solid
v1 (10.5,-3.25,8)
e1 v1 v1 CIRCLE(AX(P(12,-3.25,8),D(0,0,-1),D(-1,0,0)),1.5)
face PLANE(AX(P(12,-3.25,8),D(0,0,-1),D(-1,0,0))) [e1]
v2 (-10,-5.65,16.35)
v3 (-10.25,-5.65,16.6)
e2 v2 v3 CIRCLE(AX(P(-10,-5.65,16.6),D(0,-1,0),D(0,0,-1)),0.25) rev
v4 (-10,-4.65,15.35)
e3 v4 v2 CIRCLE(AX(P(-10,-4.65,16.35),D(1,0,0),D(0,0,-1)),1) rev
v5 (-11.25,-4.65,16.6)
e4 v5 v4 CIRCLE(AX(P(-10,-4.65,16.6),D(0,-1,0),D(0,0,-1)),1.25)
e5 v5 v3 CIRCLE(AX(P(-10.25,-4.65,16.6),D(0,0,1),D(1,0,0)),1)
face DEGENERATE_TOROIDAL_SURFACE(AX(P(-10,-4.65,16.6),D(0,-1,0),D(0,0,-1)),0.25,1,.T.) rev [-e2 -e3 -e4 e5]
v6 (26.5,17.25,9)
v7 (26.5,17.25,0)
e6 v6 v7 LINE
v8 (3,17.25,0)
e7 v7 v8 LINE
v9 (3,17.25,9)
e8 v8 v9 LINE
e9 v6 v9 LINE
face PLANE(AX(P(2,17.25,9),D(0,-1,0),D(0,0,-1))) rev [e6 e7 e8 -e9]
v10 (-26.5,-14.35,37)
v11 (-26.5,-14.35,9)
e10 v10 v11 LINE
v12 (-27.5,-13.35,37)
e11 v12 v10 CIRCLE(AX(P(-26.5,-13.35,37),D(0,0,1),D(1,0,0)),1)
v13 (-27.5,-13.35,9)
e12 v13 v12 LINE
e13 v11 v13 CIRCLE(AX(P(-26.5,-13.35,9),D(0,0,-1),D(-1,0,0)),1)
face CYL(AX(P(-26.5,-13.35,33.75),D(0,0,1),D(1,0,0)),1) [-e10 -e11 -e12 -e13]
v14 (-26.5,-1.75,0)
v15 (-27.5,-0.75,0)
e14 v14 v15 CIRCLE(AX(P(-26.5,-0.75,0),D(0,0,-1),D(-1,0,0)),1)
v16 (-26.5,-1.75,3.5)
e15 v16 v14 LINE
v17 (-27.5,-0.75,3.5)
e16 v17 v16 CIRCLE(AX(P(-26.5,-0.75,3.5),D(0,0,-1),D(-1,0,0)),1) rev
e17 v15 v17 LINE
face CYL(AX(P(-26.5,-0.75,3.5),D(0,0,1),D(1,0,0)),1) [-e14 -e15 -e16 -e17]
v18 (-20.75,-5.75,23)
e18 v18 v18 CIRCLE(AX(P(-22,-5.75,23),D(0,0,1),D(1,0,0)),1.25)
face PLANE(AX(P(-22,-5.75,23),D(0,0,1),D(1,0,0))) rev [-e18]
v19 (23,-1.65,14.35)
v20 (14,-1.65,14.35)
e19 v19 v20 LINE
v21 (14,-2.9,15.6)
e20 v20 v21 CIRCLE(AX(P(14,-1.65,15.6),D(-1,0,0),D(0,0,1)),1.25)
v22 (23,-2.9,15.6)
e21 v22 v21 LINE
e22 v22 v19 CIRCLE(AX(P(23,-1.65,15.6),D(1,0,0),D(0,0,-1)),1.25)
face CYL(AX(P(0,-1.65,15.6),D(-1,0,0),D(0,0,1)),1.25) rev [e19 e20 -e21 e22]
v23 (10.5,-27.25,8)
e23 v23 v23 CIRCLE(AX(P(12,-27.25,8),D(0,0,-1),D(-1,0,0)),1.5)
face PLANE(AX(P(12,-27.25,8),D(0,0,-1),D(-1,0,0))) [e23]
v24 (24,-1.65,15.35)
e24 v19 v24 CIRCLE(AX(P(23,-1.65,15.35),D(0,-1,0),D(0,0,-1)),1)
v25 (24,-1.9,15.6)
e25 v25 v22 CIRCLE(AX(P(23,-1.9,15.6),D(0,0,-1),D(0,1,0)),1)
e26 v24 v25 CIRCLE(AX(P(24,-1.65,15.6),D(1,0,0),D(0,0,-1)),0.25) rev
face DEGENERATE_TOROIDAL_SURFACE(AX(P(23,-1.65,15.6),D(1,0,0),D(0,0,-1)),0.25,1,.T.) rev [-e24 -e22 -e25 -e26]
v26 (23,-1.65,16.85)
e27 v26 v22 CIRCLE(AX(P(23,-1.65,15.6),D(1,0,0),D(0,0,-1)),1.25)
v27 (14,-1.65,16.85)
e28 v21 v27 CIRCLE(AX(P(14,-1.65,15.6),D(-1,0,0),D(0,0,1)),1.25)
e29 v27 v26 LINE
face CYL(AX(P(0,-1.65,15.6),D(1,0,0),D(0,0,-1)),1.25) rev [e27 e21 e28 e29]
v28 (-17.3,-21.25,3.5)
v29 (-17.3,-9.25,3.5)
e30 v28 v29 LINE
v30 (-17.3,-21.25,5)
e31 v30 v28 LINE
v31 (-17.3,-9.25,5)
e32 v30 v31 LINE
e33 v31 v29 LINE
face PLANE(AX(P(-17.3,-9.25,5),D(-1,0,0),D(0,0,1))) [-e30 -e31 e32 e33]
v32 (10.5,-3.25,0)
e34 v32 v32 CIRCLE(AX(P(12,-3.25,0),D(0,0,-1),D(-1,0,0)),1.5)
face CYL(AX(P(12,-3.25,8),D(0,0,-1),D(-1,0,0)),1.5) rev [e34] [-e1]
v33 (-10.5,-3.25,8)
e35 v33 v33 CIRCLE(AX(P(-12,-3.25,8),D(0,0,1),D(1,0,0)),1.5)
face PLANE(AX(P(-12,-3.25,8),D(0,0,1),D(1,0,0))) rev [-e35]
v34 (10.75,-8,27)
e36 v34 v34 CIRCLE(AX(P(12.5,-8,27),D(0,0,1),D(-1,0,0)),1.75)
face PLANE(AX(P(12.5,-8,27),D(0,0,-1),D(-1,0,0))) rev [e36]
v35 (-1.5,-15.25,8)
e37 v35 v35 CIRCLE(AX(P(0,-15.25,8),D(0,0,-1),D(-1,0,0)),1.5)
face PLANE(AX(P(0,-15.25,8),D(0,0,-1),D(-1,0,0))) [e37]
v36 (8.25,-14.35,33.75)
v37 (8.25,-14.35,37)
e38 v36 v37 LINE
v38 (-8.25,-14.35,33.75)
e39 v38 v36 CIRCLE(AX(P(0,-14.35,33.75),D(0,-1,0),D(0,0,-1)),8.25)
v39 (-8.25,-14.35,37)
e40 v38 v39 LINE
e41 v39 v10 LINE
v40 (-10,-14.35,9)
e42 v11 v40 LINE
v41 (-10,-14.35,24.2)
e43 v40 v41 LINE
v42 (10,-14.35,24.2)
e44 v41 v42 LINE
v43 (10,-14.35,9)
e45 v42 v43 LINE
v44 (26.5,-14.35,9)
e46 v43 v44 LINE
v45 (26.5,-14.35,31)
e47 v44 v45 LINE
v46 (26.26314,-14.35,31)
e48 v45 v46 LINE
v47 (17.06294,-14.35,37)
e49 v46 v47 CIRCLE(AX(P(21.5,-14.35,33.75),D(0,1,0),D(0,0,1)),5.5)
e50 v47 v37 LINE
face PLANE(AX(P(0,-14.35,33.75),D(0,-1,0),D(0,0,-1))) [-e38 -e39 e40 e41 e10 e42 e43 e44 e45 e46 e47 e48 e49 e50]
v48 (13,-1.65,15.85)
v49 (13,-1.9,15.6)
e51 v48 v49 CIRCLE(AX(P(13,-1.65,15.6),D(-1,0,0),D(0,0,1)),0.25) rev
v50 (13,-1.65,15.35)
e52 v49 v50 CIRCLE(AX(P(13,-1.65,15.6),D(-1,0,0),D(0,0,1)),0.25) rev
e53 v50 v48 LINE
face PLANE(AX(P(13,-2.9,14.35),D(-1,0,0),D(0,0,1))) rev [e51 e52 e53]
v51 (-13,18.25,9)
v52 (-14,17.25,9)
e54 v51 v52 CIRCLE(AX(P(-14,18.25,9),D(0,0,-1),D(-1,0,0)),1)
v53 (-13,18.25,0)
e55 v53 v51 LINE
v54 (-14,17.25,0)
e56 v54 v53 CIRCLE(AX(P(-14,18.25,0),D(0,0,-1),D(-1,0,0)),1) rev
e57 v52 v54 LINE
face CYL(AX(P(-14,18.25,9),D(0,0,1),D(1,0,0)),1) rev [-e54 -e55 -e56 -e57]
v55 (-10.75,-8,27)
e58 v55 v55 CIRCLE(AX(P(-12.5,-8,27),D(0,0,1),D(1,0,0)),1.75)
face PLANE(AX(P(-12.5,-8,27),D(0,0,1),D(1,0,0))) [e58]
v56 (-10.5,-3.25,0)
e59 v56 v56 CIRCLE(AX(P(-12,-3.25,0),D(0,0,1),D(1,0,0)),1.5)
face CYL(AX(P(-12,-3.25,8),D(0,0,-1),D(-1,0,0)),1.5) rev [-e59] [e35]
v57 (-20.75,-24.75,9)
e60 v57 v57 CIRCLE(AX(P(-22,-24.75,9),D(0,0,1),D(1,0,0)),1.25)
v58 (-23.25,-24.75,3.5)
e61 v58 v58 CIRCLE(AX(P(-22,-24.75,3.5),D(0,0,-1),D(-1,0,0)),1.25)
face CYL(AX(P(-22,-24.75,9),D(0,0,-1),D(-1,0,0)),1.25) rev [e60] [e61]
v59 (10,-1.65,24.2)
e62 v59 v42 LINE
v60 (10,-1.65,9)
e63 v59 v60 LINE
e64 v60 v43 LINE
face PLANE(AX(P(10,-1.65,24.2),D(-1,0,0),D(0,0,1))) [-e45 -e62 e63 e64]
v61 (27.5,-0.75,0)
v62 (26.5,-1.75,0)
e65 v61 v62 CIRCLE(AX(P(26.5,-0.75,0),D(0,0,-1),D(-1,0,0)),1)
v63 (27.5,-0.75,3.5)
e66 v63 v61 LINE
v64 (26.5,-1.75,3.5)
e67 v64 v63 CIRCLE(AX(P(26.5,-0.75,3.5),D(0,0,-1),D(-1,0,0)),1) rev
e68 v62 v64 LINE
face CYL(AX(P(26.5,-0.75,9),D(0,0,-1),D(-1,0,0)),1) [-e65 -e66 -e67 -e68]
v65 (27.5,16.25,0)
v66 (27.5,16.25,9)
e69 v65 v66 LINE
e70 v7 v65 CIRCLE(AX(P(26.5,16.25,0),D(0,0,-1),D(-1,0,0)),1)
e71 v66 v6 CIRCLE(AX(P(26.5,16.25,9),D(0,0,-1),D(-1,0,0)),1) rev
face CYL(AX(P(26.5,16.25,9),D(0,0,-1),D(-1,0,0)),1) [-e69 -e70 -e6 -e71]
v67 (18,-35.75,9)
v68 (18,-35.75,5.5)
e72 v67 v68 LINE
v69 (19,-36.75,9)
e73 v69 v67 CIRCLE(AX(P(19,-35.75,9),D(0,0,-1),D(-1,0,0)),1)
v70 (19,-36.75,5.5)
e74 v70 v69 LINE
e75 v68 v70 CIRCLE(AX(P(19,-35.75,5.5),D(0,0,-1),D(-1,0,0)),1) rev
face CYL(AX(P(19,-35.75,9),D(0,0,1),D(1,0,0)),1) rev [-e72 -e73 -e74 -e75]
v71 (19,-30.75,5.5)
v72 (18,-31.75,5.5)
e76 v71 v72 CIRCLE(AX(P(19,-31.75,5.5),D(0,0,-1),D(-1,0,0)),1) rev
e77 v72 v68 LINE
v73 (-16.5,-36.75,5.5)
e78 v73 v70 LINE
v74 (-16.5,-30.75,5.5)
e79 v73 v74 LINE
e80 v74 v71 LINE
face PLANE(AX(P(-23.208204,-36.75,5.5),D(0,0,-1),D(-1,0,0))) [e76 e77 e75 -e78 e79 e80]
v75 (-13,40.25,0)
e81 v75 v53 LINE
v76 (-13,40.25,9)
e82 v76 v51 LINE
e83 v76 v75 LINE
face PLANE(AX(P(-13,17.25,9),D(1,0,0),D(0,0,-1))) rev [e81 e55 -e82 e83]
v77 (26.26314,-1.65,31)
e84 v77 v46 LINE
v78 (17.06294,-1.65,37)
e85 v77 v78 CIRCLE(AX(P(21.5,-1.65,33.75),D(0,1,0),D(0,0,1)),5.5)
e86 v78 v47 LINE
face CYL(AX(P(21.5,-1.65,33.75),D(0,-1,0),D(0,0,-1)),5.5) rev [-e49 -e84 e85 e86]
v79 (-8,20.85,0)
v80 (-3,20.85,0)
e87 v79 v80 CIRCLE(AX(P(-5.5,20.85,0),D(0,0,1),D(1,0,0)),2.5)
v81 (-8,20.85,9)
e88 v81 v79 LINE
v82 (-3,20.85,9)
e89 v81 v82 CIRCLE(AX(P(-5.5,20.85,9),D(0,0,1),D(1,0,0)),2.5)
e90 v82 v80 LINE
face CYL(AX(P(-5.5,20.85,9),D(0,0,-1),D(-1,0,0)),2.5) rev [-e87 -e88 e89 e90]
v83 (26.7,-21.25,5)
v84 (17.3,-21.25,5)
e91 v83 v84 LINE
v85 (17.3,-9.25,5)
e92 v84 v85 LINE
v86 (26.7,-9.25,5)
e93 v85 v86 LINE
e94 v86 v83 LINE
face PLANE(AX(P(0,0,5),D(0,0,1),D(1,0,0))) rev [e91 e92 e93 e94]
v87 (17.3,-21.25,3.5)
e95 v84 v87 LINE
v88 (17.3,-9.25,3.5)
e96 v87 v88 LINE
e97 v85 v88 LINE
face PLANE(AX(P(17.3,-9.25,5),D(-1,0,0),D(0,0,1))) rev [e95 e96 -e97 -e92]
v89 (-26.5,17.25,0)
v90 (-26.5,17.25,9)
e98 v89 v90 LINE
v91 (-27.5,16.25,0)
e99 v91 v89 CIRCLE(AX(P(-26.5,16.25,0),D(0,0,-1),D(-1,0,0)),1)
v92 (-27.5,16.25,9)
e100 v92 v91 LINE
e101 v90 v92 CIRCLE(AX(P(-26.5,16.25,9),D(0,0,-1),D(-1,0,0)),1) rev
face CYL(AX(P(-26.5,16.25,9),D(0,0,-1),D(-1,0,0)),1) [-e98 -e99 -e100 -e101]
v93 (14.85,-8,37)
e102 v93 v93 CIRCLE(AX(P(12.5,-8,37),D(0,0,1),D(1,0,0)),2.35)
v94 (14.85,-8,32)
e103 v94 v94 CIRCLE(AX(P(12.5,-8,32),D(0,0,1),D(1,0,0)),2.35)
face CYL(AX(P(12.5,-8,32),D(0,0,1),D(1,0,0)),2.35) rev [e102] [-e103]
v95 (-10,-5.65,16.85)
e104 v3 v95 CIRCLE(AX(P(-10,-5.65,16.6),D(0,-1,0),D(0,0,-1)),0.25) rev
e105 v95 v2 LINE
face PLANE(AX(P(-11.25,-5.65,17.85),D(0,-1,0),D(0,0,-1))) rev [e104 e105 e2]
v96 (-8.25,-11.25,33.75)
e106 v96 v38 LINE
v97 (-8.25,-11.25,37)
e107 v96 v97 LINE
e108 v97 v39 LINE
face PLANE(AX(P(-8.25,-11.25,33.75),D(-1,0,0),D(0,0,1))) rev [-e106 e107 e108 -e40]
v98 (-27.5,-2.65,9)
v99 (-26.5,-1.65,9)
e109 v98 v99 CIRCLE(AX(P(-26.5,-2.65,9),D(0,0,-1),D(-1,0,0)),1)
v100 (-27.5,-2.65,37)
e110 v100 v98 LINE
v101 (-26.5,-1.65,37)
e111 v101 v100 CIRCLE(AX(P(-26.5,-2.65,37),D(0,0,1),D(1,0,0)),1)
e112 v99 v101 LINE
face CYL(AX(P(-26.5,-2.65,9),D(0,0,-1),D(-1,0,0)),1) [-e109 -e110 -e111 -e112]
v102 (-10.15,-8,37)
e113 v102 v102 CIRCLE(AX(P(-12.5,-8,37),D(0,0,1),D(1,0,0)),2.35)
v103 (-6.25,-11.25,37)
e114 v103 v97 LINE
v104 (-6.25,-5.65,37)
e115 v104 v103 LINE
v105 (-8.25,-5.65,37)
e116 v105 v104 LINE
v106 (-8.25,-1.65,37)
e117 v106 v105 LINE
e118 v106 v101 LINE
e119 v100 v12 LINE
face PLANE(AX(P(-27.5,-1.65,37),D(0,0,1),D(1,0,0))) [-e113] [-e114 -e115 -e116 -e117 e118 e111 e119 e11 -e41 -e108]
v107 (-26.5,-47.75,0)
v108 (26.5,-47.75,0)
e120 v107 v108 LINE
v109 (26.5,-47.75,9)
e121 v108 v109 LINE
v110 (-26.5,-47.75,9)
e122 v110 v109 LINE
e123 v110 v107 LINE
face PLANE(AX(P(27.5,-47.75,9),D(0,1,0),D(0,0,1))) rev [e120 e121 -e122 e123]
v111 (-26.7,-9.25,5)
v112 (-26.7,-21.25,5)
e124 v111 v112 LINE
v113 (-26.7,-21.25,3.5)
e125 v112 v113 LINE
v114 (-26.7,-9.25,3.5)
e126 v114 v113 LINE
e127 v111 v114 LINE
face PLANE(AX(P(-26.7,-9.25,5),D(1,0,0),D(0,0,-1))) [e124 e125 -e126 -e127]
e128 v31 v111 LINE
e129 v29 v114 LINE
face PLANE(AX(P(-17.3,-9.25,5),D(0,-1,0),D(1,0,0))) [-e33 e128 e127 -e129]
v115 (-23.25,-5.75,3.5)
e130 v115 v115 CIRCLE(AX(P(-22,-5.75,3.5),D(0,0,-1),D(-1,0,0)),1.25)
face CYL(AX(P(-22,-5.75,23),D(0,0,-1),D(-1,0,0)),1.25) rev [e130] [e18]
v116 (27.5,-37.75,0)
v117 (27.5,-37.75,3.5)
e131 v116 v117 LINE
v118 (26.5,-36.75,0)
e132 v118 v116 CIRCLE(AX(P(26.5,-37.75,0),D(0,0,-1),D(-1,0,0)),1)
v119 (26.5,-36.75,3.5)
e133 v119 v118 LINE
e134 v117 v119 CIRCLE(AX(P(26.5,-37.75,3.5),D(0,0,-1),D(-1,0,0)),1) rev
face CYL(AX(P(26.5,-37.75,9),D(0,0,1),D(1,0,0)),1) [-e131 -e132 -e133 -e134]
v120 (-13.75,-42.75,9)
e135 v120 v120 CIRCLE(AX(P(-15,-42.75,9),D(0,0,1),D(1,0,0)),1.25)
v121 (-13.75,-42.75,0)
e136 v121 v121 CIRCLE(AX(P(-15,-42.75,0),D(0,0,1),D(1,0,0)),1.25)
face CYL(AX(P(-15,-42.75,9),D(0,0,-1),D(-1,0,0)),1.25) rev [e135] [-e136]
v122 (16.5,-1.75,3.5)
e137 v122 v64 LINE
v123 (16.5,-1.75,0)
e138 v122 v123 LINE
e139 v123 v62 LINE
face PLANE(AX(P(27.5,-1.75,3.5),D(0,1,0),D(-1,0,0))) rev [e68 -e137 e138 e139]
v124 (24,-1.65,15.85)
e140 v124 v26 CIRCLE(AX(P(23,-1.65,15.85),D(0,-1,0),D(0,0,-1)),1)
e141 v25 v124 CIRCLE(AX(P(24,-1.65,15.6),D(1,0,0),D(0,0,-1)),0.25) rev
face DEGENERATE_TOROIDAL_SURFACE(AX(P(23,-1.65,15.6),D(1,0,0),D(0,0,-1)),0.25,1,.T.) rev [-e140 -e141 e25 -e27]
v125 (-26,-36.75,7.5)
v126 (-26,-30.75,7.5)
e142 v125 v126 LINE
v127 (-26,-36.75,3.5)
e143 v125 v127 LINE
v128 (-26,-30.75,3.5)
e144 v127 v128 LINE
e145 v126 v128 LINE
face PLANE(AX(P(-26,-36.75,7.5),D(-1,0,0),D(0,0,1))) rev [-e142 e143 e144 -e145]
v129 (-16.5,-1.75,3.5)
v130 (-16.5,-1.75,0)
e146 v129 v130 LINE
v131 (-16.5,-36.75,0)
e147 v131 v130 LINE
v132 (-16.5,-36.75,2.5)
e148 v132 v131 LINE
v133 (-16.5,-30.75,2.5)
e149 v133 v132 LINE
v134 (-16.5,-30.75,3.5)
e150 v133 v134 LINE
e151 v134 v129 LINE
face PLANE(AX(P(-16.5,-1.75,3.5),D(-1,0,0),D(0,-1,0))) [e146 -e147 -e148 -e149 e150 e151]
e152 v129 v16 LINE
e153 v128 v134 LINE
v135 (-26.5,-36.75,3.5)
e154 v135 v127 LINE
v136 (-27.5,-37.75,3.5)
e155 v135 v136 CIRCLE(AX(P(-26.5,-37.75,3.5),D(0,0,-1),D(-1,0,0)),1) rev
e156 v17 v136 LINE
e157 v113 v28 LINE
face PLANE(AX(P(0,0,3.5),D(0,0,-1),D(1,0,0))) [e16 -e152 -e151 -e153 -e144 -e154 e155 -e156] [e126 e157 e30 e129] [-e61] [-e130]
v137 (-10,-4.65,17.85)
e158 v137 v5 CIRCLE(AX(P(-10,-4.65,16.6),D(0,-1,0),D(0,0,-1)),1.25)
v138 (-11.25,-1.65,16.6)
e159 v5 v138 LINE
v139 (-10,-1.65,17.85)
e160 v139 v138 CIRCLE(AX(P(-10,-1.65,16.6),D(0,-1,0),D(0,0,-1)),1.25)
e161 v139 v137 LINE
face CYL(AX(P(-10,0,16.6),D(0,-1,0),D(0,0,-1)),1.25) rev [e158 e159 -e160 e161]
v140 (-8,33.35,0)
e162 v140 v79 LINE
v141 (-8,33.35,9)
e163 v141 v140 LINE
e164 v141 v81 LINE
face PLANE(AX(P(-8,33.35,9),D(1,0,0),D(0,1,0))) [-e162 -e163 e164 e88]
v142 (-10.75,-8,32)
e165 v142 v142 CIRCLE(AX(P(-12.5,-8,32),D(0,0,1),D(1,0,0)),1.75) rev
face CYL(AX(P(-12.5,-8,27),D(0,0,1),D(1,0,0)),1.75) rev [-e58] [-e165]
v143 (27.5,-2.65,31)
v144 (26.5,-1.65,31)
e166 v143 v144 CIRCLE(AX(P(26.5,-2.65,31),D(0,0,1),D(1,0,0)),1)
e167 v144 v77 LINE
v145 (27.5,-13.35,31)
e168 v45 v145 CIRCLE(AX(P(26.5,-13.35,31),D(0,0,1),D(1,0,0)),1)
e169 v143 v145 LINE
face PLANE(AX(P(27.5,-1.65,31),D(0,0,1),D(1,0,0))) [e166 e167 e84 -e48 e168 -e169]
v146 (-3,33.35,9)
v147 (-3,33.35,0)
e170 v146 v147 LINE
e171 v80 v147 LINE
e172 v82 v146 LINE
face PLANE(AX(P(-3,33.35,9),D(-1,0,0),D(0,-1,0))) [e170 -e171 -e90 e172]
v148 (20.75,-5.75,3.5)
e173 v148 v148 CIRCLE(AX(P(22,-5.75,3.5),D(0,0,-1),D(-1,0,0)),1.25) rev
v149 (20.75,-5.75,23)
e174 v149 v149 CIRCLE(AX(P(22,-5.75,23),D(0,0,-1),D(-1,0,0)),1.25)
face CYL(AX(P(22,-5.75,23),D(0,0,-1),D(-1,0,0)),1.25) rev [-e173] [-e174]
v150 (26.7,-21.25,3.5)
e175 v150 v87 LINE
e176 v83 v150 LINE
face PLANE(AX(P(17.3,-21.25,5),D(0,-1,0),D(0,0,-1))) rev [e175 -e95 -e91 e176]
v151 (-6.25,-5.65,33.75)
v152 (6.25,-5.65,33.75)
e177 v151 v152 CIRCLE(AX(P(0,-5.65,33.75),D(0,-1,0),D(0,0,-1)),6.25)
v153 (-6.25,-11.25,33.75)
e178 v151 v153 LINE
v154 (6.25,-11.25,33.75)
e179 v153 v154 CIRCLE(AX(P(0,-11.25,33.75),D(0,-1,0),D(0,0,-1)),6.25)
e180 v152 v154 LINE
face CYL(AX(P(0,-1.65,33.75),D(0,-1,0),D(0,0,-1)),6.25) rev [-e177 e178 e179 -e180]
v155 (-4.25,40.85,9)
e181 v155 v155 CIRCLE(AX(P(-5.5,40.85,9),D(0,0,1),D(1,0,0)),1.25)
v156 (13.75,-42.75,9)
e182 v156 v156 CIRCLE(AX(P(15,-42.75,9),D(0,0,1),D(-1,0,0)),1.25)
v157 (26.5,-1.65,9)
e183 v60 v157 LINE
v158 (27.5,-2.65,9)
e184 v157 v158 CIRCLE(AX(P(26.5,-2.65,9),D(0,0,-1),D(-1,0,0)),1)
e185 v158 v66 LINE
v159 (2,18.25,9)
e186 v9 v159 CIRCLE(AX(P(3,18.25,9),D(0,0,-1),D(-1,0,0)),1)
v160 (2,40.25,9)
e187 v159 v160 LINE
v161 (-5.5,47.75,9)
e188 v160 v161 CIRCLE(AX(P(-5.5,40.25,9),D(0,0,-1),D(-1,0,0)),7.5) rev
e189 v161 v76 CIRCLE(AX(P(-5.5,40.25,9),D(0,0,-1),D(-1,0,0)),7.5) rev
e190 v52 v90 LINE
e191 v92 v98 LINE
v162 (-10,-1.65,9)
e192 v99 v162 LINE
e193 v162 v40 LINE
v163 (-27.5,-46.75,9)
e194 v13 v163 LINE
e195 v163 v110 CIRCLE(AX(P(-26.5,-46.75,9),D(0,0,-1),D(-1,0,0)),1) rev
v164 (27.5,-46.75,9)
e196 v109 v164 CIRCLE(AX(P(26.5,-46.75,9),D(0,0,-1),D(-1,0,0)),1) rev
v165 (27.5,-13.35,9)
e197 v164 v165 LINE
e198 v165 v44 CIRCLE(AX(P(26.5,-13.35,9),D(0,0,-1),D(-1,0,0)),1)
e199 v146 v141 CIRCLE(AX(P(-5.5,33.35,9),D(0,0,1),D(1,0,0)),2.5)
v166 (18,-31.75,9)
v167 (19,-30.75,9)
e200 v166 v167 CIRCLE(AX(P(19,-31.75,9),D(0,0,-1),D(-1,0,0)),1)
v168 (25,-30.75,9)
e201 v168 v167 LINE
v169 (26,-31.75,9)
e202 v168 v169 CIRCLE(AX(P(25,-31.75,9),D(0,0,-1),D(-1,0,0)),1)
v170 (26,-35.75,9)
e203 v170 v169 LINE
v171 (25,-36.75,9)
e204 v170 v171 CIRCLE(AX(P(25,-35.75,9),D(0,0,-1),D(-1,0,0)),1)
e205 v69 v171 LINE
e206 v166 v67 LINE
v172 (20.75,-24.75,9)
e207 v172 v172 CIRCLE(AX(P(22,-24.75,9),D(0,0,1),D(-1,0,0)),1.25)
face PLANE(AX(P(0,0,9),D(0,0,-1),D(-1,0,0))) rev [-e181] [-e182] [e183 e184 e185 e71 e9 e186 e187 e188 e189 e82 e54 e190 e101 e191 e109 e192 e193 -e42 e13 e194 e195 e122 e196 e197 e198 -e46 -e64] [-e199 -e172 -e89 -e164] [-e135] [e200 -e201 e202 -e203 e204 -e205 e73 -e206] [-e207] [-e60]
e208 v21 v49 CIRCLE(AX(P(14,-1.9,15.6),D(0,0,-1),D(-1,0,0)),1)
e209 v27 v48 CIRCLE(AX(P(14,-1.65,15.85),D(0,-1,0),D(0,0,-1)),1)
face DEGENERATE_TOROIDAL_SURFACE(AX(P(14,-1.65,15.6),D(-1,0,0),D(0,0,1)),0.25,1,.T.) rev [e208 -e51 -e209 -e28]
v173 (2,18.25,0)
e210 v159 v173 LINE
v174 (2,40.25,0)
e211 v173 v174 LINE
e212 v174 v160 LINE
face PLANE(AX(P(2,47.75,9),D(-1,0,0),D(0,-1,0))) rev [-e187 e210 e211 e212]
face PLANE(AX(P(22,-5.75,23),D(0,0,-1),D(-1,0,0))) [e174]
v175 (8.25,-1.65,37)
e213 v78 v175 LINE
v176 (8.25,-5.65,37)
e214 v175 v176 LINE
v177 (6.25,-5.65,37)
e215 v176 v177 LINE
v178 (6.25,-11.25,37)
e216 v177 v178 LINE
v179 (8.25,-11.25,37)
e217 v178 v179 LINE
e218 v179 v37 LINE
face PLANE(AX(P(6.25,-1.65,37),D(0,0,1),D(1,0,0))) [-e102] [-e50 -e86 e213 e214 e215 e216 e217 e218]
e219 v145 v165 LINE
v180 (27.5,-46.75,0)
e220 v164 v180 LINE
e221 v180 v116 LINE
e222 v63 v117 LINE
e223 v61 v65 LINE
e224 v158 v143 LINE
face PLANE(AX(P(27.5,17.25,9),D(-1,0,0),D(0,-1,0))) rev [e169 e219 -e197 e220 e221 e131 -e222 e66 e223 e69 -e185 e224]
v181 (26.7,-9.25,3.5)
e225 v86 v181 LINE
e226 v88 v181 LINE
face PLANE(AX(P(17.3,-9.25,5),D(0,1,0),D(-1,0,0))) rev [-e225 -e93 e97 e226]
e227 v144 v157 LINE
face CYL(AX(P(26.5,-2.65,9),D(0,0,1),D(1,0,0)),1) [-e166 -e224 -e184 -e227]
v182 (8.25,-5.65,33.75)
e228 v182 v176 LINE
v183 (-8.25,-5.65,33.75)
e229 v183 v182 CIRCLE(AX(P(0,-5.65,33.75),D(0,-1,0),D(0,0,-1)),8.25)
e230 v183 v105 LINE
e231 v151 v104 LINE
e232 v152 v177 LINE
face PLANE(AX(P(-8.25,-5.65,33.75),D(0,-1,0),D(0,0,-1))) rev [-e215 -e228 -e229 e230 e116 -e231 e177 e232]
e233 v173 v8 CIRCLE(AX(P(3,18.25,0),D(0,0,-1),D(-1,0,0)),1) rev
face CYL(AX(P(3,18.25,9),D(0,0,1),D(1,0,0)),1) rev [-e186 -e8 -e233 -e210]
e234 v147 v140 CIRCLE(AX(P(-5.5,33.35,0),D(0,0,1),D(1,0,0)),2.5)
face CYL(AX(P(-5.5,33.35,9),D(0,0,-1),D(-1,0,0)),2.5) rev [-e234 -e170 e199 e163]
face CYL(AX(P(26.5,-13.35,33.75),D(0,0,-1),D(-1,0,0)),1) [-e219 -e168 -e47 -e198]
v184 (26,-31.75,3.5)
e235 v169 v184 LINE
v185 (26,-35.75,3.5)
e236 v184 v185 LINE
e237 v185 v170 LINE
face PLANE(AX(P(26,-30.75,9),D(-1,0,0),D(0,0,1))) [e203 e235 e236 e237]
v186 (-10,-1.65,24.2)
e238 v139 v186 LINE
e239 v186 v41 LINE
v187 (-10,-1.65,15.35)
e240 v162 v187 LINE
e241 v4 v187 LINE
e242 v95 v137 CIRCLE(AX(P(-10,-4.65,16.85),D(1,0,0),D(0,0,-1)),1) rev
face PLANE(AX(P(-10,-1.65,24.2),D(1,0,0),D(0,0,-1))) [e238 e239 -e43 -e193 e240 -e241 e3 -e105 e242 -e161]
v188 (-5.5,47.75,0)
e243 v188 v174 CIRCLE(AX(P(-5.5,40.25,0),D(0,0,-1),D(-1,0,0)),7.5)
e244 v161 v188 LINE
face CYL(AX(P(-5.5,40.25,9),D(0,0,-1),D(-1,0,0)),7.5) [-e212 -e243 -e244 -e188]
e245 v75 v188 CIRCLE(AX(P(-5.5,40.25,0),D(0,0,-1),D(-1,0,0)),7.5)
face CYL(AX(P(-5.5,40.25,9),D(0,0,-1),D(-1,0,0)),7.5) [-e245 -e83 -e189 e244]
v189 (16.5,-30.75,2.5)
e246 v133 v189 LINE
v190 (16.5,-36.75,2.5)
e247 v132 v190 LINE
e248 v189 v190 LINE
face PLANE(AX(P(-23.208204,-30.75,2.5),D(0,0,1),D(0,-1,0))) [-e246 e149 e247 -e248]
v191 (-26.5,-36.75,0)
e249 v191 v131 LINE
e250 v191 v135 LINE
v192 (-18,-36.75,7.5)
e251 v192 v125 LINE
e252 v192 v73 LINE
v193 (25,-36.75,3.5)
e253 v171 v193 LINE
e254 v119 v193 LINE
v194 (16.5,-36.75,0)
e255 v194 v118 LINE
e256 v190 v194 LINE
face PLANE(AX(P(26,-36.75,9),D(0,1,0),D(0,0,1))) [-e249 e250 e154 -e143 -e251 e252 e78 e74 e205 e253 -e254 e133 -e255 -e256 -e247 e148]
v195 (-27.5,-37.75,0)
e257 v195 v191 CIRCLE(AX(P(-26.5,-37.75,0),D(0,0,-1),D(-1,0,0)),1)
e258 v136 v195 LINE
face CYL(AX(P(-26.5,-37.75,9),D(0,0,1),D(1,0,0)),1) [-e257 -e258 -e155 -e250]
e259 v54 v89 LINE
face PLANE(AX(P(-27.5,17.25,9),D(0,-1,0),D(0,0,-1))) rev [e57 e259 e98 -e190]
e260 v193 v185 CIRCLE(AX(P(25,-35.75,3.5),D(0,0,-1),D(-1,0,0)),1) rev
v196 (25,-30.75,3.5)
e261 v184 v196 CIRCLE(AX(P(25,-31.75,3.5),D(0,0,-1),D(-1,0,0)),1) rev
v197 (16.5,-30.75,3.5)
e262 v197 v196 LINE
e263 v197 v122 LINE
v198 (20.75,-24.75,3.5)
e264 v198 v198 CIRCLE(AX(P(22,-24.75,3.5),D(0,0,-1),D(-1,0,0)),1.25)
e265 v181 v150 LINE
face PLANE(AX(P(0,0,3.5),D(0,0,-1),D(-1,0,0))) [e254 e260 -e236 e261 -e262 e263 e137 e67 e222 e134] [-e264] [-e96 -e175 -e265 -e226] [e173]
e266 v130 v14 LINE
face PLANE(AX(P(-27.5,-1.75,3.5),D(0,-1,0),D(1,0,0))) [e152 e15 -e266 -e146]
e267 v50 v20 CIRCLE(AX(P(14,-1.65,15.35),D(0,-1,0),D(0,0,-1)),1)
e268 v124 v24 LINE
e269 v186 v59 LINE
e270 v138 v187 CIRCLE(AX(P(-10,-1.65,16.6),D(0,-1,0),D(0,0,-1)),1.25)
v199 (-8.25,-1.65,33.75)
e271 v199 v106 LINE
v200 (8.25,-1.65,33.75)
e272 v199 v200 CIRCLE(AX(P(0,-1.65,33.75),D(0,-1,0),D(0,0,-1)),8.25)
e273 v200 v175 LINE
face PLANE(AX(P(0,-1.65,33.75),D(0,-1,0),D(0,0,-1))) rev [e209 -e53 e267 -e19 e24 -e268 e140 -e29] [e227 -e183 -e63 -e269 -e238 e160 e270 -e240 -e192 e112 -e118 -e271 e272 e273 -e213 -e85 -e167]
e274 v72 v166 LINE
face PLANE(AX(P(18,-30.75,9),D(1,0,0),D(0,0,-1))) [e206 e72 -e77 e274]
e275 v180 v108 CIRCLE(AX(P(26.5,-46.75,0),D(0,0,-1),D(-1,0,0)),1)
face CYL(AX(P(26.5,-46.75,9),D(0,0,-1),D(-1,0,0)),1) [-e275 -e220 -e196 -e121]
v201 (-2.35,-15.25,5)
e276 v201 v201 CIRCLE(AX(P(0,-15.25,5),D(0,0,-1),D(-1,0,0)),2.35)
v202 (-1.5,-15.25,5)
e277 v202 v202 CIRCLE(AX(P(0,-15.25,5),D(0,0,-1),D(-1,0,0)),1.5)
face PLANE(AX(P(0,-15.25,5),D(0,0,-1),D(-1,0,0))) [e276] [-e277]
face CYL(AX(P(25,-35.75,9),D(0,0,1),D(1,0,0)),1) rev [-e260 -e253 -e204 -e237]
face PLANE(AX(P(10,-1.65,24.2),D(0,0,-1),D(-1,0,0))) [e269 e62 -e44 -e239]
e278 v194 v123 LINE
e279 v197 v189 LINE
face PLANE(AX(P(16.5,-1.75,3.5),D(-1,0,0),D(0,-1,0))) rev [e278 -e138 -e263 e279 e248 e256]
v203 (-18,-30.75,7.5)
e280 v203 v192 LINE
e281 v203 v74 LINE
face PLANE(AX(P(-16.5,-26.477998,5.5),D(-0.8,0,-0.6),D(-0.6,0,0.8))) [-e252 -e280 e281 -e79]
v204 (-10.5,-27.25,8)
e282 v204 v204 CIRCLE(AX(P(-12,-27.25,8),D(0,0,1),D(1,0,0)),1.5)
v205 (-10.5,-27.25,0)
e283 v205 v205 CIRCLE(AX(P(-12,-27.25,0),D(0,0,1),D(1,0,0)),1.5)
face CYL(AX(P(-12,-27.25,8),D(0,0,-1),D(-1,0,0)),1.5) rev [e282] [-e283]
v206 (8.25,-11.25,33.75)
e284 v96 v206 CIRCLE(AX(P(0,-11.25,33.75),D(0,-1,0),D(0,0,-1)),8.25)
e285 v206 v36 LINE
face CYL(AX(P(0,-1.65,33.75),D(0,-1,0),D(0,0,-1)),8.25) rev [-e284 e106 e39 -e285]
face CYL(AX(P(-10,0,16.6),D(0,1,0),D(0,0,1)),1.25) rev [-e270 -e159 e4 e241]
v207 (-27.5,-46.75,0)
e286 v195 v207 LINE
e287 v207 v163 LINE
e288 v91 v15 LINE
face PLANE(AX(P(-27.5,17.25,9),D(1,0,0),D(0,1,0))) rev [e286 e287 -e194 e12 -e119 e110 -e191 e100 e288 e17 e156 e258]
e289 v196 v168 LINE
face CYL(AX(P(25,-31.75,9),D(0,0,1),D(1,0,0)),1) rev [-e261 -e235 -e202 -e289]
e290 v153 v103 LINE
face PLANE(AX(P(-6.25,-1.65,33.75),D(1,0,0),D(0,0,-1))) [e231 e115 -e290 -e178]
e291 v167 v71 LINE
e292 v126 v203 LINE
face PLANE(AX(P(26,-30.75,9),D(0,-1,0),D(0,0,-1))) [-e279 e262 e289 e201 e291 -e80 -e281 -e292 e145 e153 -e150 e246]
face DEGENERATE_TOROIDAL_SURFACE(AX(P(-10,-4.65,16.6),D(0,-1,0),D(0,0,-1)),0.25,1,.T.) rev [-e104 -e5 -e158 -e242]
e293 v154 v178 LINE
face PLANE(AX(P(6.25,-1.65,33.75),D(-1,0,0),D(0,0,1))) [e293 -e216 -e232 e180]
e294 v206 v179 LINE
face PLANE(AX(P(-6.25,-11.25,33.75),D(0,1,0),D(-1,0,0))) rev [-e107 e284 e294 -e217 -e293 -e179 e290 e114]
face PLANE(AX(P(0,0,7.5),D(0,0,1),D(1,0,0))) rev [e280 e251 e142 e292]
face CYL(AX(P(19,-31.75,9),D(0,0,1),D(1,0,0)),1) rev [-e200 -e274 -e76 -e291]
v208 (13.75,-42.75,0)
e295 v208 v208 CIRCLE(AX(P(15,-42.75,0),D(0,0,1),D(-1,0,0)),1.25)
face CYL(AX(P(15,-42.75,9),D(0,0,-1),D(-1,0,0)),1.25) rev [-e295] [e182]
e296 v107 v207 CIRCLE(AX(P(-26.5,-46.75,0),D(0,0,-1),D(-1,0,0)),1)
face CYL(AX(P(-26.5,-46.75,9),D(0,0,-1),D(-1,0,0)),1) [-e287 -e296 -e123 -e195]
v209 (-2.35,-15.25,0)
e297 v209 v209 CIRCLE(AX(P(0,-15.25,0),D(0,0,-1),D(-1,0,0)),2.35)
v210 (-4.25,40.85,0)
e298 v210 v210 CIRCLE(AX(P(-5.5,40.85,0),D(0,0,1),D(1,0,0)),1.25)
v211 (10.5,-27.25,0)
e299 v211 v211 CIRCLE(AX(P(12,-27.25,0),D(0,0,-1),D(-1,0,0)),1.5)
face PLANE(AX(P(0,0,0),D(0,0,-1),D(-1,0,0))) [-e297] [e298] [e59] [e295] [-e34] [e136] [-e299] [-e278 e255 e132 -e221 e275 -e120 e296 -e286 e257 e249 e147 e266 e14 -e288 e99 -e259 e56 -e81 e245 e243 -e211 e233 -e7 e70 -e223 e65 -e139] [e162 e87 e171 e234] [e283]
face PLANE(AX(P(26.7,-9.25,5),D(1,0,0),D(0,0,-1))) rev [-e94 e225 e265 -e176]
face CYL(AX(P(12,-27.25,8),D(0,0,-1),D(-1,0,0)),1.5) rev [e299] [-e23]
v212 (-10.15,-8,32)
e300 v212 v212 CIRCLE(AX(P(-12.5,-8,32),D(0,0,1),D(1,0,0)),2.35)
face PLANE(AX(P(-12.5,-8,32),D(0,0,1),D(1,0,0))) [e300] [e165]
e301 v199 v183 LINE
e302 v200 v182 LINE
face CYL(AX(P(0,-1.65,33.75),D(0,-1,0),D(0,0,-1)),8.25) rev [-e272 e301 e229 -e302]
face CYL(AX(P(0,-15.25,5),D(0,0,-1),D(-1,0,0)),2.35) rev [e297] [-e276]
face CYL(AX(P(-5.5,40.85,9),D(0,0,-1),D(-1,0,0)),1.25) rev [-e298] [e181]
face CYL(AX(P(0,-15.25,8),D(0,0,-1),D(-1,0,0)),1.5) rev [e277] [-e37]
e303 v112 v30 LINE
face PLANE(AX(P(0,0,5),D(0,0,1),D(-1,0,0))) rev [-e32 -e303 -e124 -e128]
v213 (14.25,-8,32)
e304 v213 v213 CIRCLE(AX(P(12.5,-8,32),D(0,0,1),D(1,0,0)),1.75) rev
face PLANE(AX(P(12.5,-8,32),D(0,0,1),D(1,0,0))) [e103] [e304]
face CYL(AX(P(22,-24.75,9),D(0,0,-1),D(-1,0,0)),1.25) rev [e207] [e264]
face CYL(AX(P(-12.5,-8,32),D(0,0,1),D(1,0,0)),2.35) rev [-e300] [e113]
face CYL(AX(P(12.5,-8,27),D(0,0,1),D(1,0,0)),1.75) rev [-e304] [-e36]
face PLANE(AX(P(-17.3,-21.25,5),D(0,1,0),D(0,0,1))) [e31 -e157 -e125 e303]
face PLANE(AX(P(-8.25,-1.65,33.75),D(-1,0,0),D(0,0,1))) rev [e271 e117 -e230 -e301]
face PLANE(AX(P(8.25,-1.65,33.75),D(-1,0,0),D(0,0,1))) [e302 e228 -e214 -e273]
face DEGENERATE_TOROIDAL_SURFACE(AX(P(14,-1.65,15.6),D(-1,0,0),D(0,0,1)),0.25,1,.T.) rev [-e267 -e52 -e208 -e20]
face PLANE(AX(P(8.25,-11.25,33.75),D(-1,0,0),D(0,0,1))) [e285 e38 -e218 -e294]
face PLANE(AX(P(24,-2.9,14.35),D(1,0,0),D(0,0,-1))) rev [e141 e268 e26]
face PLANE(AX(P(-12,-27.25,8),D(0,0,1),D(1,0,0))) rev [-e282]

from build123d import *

# Parameters (mm, degrees)
SKETCH1_R           = 1.25
SKETCH1_W           = 8
SKETCH1_H           = 6
BOSS_EXTRUDE1_DEPTH = 9
FILLET1_R           = 7.5
FILLET2_R           = 1
BOSS_EXTRUDE2_DEPTH = 12.7
SKETCH3_W           = 2
SKETCH3_H           = 4
SKETCH3_H_2         = 3.1
SKETCH5_R           = 1.75
CUT_EXTRUDE1_DEPTH  = 10
SKETCH6_R           = 2.35
CUT_EXTRUDE2_DEPTH  = 5
SKETCH7_W           = 2.5
SKETCH7_H           = 4
CUT_EXTRUDE3_DEPTH  = 1.25
FILLET3_R           = 1.25
FILLET4_R           = 1
SKETCH8_W           = 11
SKETCH8_H           = 2.5
CUT_EXTRUDE4_DEPTH  = 1.25
FILLET5_R           = 1.25
FILLET6_R           = 1
SKETCH9_R           = 1.5
CUT_EXTRUDE5_DEPTH  = 8
SKETCH9_3_R         = 2.35
CUT_EXTRUDE6_DEPTH  = 5
SKETCH9_4_R         = 1.25
CUT_EXTRUDE7_DEPTH  = 23
SKETCH10_R          = 1.5
CUT_EXTRUDE8_DEPTH  = 8
SKETCH11_W          = 11
SKETCH11_H          = 35
CUT_EXTRUDE9_DEPTH  = 3.5
SKETCH13_W          = 9.4
SKETCH13_H          = 12
CUT_EXTRUDE10_DEPTH = 1.5
CUT_EXTRUDE11_DEPTH = 33
SKETCH15_W          = 2
SKETCH15_H          = 6
CUT_EXTRUDE12_DEPTH = 1.5
FILLET7_R           = 1
SKETCH16_W          = 8
SKETCH16_H          = 6
CUT_EXTRUDE13_DEPTH = 7.5
CUT_EXTRUDE14_DEPTH = 6
FILLET8_R           = 1


with BuildPart() as part:
    # Sketch1 → Boss-Extrude1 (new body)
    with BuildSketch(Plane.XY):
        Polygon((-27.5, 17.25), (-13, 17.25), (-13, 47.75), (2, 47.75), (2, 17.25), (27.5, 17.25), (27.5, -47.75), (-27.5, -47.75), align=None)
        with Locations((-5.5, 40.85)):
            Circle(SKETCH1_R, mode=Mode.SUBTRACT)
        with Locations((-22, -24.75)):
            Circle(SKETCH1_R, mode=Mode.SUBTRACT)
        with Locations((-15, -42.75)):
            Circle(SKETCH1_R, mode=Mode.SUBTRACT)
        with Locations(Location((15, -42.75, 0), (0, 0, 180))):
            Circle(SKETCH1_R, mode=Mode.SUBTRACT)
        with Locations(Location((22, -24.75, 0), (0, 0, 180))):
            Circle(SKETCH1_R, mode=Mode.SUBTRACT)
        with BuildLine():
            Line((-3, 33.35), (-3, 20.85))
            ThreePointArc((-3, 20.85), (-5.5, 18.35), (-8, 20.85))
            Line((-8, 20.85), (-8, 33.35))
            ThreePointArc((-8, 33.35), (-5.5, 35.85), (-3, 33.35))
        make_face(mode=Mode.SUBTRACT)
        with Locations((22, -33.75)):
            Rectangle(SKETCH1_W, SKETCH1_H, mode=Mode.SUBTRACT)
    extrude(amount=BOSS_EXTRUDE1_DEPTH)

    # Fillet1
    fillet1_edges = [part.edges().sort_by_distance(p)[0] for p in [
        (-13, 47.75, 4.5),
        (2, 47.75, 4.5),
    ]]
    fillet(fillet1_edges, radius=FILLET1_R - 0.0001)  # a hair under: the kernel refuses the full size

    # Fillet2
    fillet2_edges = [part.edges().sort_by_distance(p)[0] for p in [
        (-27.5, 17.25, 4.5),
        (-13, 17.25, 4.5),
        (2, 17.25, 4.5),
        (27.5, 17.25, 4.5),
        (27.5, -47.75, 4.5),
        (-27.5, -47.75, 4.5),
    ]]
    fillet(fillet2_edges, radius=FILLET2_R)

    # Sketch2 → Boss-Extrude2 (add)
    with BuildSketch(Plane(origin=(0, -14.35, 0), x_dir=(-1, 0, 0), z_dir=(0, -1, 0))):
        with BuildLine():
            Line((27.5, -9), (10, -9))
            Line((10, -9), (10, -24.2))
            Line((10, -24.2), (-10, -24.2))
            Line((-10, -24.2), (-10, -9))
            Line((-10, -9), (-27.5, -9))
            Line((-27.5, -9), (-27.5, -31))
            Line((-27.5, -31), (-26.263139721, -31))
            ThreePointArc((-26.263139721, -31), (-18.495572929, -29.143111899), (-17.062940163, -37))
            Line((-17.062940163, -37), (-6.25, -37))
            Line((-6.25, -37), (-6.25, -33.75))
            ThreePointArc((-6.25, -33.75), (0, -27.5), (6.25, -33.75))
            Line((6.25, -33.75), (6.25, -37))
            Line((6.25, -37), (27.5, -37))
            Line((27.5, -37), (27.5, -9))
        make_face()
    extrude(amount=-BOSS_EXTRUDE2_DEPTH)

    # Cut-Sweep1: sweep along a path in Sketch4
    with BuildLine(Plane(origin=(0, -1.65, 0), x_dir=(1, 0, 0), z_dir=(0, 1, 0))) as cut_sweep1_path:
        Line((-6.25, -37), (-6.25, -33.75))
        ThreePointArc((-6.25, -33.75), (0, -27.5), (6.25, -33.75))
        Line((6.25, -33.75), (6.25, -37))
    # Sketch3 → Cut-Sweep1 (sweep, cut)
    with BuildSketch(Plane.XY.offset(37)):
        with Locations((-7.25, -3.65)):
            Rectangle(SKETCH3_W, SKETCH3_H)
        with Locations((-7.25, -12.8)):
            Rectangle(SKETCH3_W, SKETCH3_H_2)
    sweep(path=cut_sweep1_path.line, mode=Mode.SUBTRACT)

    # Sketch5 → Cut-Extrude1 (cut)
    with BuildSketch(Plane.XY.offset(37)):
        with Locations((-12.5, -8)):
            Circle(SKETCH5_R)
        with Locations(Location((12.5, -8, 0), (0, 0, 180))):
            Circle(SKETCH5_R)
    extrude(amount=-CUT_EXTRUDE1_DEPTH, mode=Mode.SUBTRACT)

    # Sketch6 → Cut-Extrude2 (cut)
    with BuildSketch(Plane.XY.offset(37)):
        with Locations((-12.5, -8)):
            Circle(SKETCH6_R)
        with Locations((12.5, -8)):
            Circle(SKETCH6_R)
    extrude(amount=-CUT_EXTRUDE2_DEPTH, mode=Mode.SUBTRACT)

    # Sketch7 → Cut-Extrude3 (cut)
    with BuildSketch(Plane(origin=(-10, 0, 0), x_dir=(0, 0, -1), z_dir=(1, 0, 0))):
        with Locations((-16.6, -3.65)):
            Rectangle(SKETCH7_W, SKETCH7_H)
    extrude(amount=-CUT_EXTRUDE3_DEPTH, mode=Mode.SUBTRACT)

    # Fillet3
    fillet3_edges = [part.edges().sort_by_distance(p)[0] for p in [
        (-11.25, -3.65, 17.85),
        (-11.25, -3.65, 15.35),
    ]]
    fillet(fillet3_edges, radius=FILLET3_R - 0.0001)  # a hair under: the kernel refuses the full size

    # Fillet4
    fillet4_edges = [part.edges().sort_by_distance(p)[0] for p in [
        (-10.883912766, -5.65, 15.716087234),
        (-10.883912766, -5.65, 17.483912766),
    ]]
    fillet(fillet4_edges, radius=FILLET4_R)

    # Sketch8 → Cut-Extrude4 (cut)
    with BuildSketch(Plane(origin=(0, -1.65, 0), x_dir=(1, 0, 0), z_dir=(0, 1, 0))):
        with Locations((18.5, -15.6)):
            Rectangle(SKETCH8_W, SKETCH8_H)
    extrude(amount=-CUT_EXTRUDE4_DEPTH, mode=Mode.SUBTRACT)

    # Fillet5
    fillet5_edges = [part.edges().sort_by_distance(p)[0] for p in [
        (18.5, -2.9, 16.85),
        (18.5, -2.9, 14.35),
    ]]
    fillet(fillet5_edges, radius=FILLET5_R - 0.0001)  # a hair under: the kernel refuses the full size

    # Fillet6
    fillet6_edges = [part.edges().sort_by_distance(p)[0] for p in [
        (24, -2.533912766, 14.716087234),
        (24, -2.533912766, 16.483912766),
        (13, -2.533912766, 14.716087234),
        (13, -2.533912766, 16.483912766),
    ]]
    fillet(fillet6_edges, radius=FILLET6_R)

    # Sketch9 → Cut-Extrude5 (cut)
    with BuildSketch(Plane(origin=(0, 0, 0), x_dir=(-1, 0, 0), z_dir=(0, 0, -1))):
        with Locations((-12, -3.25)):
            Circle(SKETCH9_R)
        with Locations((-12, -27.25)):
            Circle(SKETCH9_R)
        with Locations(Location((12, -27.25, 0), (0, 0, 180))):
            Circle(SKETCH9_R)
        with Locations(Location((12, -3.25, 0), (0, 0, 180))):
            Circle(SKETCH9_R)
    extrude(amount=-CUT_EXTRUDE5_DEPTH, mode=Mode.SUBTRACT)

    # Sketch9<3> → Cut-Extrude6 (cut)
    with BuildSketch(Plane(origin=(0, 0, 0), x_dir=(-1, 0, 0), z_dir=(0, 0, -1))):
        with Locations((0, -15.25)):
            Circle(SKETCH9_3_R)
    extrude(amount=-CUT_EXTRUDE6_DEPTH, mode=Mode.SUBTRACT)

    # Sketch9<4> → Cut-Extrude7 (cut)
    with BuildSketch(Plane(origin=(0, 0, 0), x_dir=(-1, 0, 0), z_dir=(0, 0, -1))):
        with Locations((-22, -5.75)):
            Circle(SKETCH9_4_R)
        with Locations(Location((22, -5.75, 0), (0, 0, 180))):
            Circle(SKETCH9_4_R)
    extrude(amount=-CUT_EXTRUDE7_DEPTH, mode=Mode.SUBTRACT)

    # Sketch10 → Cut-Extrude8 (cut)
    with BuildSketch(Plane(origin=(0, 0, 0), x_dir=(-1, 0, 0), z_dir=(0, 0, -1))):
        with Locations((0, -15.25)):
            Circle(SKETCH10_R)
    extrude(amount=-CUT_EXTRUDE8_DEPTH, mode=Mode.SUBTRACT)

    # Sketch11 → Cut-Extrude9 (cut)
    with BuildSketch(Plane(origin=(0, 0, 0), x_dir=(-1, 0, 0), z_dir=(0, 0, -1))):
        with Locations((-22, -19.25)):
            Rectangle(SKETCH11_W, SKETCH11_H)
    cut_extrude9 = extrude(amount=-CUT_EXTRUDE9_DEPTH, mode=Mode.SUBTRACT)

    # Sketch13 → Cut-Extrude10 (cut)
    with BuildSketch(Plane(origin=(0, 0, 3.5), x_dir=(-1, 0, 0), z_dir=(0, 0, -1))):
        with Locations((-22, -15.25)):
            Rectangle(SKETCH13_W, SKETCH13_H)
    cut_extrude10 = extrude(amount=-CUT_EXTRUDE10_DEPTH, mode=Mode.SUBTRACT)

    # Mirror1: Cut-Extrude9, Cut-Extrude10 across plane
    add(cut_extrude9.mirror(Plane(origin=(0, 0, 0), x_dir=(0, 0, 1), z_dir=(1, 0, 0))), mode=Mode.SUBTRACT)
    add(cut_extrude10.mirror(Plane(origin=(0, 0, 0), x_dir=(0, 0, 1), z_dir=(1, 0, 0))), mode=Mode.SUBTRACT)

    # Sketch12 → Cut-Extrude11 (cut)
    with BuildSketch(Plane(origin=(16.5, 0, 0), x_dir=(0, 0, -1), z_dir=(1, 0, 0))):
        Polygon((-3.5, -30.75), (-2.5, -30.75), (-2.5, -36.75), (-5.5, -36.75), (-5.5, -30.75), align=None)
    extrude(amount=-CUT_EXTRUDE11_DEPTH, mode=Mode.SUBTRACT)

    # Sketch15 → Cut-Extrude12 (cut)
    with BuildSketch(Plane(origin=(18, 0, 0), x_dir=(0, 0, -1), z_dir=(1, 0, 0))):
        with Locations((-4.5, -33.75)):
            Rectangle(SKETCH15_W, SKETCH15_H)
    extrude(amount=-CUT_EXTRUDE12_DEPTH, mode=Mode.SUBTRACT)

    # Fillet7
    fillet7_edges = [part.edges().sort_by_distance(p)[0] for p in [
        (27.5, -36.75, 1.75),
        (27.5, -1.75, 1.75),
        (18, -30.75, 7.25),
        (-27.5, -1.75, 1.75),
        (-27.5, -36.75, 1.75),
        (18, -36.75, 7.25),
        (26, -36.75, 6.25),
        (26, -30.75, 6.25),
    ]]
    fillet(fillet7_edges, radius=FILLET7_R)

    # Sketch16 → Cut-Extrude13 (cut)
    with BuildSketch(Plane(origin=(0, 0, 0), x_dir=(-1, 0, 0), z_dir=(0, 0, -1))):
        with Locations((22, -33.75)):
            Rectangle(SKETCH16_W, SKETCH16_H)
    extrude(amount=-CUT_EXTRUDE13_DEPTH, mode=Mode.SUBTRACT)

    # Sketch17 → Cut-Extrude14 (cut)
    with BuildSketch(Plane(origin=(0, -36.75, 0), x_dir=(1, 0, 0), z_dir=(0, 1, 0))):
        Polygon((-18, -7.5), (-18, -3.5), (-16.5, -3.5), (-16.5, -5.5), align=None)
    extrude(amount=CUT_EXTRUDE14_DEPTH, mode=Mode.SUBTRACT)

    # Fillet8
    fillet8_edges = [part.edges().sort_by_distance(p)[0] for p in [
        (-27.5, -1.65, 23),
        (27.5, -1.65, 20),
        (-27.5, -14.35, 23),
        (27.5, -14.35, 20),
    ]]
    fillet(fillet8_edges, radius=FILLET8_R)


solid = part.part
